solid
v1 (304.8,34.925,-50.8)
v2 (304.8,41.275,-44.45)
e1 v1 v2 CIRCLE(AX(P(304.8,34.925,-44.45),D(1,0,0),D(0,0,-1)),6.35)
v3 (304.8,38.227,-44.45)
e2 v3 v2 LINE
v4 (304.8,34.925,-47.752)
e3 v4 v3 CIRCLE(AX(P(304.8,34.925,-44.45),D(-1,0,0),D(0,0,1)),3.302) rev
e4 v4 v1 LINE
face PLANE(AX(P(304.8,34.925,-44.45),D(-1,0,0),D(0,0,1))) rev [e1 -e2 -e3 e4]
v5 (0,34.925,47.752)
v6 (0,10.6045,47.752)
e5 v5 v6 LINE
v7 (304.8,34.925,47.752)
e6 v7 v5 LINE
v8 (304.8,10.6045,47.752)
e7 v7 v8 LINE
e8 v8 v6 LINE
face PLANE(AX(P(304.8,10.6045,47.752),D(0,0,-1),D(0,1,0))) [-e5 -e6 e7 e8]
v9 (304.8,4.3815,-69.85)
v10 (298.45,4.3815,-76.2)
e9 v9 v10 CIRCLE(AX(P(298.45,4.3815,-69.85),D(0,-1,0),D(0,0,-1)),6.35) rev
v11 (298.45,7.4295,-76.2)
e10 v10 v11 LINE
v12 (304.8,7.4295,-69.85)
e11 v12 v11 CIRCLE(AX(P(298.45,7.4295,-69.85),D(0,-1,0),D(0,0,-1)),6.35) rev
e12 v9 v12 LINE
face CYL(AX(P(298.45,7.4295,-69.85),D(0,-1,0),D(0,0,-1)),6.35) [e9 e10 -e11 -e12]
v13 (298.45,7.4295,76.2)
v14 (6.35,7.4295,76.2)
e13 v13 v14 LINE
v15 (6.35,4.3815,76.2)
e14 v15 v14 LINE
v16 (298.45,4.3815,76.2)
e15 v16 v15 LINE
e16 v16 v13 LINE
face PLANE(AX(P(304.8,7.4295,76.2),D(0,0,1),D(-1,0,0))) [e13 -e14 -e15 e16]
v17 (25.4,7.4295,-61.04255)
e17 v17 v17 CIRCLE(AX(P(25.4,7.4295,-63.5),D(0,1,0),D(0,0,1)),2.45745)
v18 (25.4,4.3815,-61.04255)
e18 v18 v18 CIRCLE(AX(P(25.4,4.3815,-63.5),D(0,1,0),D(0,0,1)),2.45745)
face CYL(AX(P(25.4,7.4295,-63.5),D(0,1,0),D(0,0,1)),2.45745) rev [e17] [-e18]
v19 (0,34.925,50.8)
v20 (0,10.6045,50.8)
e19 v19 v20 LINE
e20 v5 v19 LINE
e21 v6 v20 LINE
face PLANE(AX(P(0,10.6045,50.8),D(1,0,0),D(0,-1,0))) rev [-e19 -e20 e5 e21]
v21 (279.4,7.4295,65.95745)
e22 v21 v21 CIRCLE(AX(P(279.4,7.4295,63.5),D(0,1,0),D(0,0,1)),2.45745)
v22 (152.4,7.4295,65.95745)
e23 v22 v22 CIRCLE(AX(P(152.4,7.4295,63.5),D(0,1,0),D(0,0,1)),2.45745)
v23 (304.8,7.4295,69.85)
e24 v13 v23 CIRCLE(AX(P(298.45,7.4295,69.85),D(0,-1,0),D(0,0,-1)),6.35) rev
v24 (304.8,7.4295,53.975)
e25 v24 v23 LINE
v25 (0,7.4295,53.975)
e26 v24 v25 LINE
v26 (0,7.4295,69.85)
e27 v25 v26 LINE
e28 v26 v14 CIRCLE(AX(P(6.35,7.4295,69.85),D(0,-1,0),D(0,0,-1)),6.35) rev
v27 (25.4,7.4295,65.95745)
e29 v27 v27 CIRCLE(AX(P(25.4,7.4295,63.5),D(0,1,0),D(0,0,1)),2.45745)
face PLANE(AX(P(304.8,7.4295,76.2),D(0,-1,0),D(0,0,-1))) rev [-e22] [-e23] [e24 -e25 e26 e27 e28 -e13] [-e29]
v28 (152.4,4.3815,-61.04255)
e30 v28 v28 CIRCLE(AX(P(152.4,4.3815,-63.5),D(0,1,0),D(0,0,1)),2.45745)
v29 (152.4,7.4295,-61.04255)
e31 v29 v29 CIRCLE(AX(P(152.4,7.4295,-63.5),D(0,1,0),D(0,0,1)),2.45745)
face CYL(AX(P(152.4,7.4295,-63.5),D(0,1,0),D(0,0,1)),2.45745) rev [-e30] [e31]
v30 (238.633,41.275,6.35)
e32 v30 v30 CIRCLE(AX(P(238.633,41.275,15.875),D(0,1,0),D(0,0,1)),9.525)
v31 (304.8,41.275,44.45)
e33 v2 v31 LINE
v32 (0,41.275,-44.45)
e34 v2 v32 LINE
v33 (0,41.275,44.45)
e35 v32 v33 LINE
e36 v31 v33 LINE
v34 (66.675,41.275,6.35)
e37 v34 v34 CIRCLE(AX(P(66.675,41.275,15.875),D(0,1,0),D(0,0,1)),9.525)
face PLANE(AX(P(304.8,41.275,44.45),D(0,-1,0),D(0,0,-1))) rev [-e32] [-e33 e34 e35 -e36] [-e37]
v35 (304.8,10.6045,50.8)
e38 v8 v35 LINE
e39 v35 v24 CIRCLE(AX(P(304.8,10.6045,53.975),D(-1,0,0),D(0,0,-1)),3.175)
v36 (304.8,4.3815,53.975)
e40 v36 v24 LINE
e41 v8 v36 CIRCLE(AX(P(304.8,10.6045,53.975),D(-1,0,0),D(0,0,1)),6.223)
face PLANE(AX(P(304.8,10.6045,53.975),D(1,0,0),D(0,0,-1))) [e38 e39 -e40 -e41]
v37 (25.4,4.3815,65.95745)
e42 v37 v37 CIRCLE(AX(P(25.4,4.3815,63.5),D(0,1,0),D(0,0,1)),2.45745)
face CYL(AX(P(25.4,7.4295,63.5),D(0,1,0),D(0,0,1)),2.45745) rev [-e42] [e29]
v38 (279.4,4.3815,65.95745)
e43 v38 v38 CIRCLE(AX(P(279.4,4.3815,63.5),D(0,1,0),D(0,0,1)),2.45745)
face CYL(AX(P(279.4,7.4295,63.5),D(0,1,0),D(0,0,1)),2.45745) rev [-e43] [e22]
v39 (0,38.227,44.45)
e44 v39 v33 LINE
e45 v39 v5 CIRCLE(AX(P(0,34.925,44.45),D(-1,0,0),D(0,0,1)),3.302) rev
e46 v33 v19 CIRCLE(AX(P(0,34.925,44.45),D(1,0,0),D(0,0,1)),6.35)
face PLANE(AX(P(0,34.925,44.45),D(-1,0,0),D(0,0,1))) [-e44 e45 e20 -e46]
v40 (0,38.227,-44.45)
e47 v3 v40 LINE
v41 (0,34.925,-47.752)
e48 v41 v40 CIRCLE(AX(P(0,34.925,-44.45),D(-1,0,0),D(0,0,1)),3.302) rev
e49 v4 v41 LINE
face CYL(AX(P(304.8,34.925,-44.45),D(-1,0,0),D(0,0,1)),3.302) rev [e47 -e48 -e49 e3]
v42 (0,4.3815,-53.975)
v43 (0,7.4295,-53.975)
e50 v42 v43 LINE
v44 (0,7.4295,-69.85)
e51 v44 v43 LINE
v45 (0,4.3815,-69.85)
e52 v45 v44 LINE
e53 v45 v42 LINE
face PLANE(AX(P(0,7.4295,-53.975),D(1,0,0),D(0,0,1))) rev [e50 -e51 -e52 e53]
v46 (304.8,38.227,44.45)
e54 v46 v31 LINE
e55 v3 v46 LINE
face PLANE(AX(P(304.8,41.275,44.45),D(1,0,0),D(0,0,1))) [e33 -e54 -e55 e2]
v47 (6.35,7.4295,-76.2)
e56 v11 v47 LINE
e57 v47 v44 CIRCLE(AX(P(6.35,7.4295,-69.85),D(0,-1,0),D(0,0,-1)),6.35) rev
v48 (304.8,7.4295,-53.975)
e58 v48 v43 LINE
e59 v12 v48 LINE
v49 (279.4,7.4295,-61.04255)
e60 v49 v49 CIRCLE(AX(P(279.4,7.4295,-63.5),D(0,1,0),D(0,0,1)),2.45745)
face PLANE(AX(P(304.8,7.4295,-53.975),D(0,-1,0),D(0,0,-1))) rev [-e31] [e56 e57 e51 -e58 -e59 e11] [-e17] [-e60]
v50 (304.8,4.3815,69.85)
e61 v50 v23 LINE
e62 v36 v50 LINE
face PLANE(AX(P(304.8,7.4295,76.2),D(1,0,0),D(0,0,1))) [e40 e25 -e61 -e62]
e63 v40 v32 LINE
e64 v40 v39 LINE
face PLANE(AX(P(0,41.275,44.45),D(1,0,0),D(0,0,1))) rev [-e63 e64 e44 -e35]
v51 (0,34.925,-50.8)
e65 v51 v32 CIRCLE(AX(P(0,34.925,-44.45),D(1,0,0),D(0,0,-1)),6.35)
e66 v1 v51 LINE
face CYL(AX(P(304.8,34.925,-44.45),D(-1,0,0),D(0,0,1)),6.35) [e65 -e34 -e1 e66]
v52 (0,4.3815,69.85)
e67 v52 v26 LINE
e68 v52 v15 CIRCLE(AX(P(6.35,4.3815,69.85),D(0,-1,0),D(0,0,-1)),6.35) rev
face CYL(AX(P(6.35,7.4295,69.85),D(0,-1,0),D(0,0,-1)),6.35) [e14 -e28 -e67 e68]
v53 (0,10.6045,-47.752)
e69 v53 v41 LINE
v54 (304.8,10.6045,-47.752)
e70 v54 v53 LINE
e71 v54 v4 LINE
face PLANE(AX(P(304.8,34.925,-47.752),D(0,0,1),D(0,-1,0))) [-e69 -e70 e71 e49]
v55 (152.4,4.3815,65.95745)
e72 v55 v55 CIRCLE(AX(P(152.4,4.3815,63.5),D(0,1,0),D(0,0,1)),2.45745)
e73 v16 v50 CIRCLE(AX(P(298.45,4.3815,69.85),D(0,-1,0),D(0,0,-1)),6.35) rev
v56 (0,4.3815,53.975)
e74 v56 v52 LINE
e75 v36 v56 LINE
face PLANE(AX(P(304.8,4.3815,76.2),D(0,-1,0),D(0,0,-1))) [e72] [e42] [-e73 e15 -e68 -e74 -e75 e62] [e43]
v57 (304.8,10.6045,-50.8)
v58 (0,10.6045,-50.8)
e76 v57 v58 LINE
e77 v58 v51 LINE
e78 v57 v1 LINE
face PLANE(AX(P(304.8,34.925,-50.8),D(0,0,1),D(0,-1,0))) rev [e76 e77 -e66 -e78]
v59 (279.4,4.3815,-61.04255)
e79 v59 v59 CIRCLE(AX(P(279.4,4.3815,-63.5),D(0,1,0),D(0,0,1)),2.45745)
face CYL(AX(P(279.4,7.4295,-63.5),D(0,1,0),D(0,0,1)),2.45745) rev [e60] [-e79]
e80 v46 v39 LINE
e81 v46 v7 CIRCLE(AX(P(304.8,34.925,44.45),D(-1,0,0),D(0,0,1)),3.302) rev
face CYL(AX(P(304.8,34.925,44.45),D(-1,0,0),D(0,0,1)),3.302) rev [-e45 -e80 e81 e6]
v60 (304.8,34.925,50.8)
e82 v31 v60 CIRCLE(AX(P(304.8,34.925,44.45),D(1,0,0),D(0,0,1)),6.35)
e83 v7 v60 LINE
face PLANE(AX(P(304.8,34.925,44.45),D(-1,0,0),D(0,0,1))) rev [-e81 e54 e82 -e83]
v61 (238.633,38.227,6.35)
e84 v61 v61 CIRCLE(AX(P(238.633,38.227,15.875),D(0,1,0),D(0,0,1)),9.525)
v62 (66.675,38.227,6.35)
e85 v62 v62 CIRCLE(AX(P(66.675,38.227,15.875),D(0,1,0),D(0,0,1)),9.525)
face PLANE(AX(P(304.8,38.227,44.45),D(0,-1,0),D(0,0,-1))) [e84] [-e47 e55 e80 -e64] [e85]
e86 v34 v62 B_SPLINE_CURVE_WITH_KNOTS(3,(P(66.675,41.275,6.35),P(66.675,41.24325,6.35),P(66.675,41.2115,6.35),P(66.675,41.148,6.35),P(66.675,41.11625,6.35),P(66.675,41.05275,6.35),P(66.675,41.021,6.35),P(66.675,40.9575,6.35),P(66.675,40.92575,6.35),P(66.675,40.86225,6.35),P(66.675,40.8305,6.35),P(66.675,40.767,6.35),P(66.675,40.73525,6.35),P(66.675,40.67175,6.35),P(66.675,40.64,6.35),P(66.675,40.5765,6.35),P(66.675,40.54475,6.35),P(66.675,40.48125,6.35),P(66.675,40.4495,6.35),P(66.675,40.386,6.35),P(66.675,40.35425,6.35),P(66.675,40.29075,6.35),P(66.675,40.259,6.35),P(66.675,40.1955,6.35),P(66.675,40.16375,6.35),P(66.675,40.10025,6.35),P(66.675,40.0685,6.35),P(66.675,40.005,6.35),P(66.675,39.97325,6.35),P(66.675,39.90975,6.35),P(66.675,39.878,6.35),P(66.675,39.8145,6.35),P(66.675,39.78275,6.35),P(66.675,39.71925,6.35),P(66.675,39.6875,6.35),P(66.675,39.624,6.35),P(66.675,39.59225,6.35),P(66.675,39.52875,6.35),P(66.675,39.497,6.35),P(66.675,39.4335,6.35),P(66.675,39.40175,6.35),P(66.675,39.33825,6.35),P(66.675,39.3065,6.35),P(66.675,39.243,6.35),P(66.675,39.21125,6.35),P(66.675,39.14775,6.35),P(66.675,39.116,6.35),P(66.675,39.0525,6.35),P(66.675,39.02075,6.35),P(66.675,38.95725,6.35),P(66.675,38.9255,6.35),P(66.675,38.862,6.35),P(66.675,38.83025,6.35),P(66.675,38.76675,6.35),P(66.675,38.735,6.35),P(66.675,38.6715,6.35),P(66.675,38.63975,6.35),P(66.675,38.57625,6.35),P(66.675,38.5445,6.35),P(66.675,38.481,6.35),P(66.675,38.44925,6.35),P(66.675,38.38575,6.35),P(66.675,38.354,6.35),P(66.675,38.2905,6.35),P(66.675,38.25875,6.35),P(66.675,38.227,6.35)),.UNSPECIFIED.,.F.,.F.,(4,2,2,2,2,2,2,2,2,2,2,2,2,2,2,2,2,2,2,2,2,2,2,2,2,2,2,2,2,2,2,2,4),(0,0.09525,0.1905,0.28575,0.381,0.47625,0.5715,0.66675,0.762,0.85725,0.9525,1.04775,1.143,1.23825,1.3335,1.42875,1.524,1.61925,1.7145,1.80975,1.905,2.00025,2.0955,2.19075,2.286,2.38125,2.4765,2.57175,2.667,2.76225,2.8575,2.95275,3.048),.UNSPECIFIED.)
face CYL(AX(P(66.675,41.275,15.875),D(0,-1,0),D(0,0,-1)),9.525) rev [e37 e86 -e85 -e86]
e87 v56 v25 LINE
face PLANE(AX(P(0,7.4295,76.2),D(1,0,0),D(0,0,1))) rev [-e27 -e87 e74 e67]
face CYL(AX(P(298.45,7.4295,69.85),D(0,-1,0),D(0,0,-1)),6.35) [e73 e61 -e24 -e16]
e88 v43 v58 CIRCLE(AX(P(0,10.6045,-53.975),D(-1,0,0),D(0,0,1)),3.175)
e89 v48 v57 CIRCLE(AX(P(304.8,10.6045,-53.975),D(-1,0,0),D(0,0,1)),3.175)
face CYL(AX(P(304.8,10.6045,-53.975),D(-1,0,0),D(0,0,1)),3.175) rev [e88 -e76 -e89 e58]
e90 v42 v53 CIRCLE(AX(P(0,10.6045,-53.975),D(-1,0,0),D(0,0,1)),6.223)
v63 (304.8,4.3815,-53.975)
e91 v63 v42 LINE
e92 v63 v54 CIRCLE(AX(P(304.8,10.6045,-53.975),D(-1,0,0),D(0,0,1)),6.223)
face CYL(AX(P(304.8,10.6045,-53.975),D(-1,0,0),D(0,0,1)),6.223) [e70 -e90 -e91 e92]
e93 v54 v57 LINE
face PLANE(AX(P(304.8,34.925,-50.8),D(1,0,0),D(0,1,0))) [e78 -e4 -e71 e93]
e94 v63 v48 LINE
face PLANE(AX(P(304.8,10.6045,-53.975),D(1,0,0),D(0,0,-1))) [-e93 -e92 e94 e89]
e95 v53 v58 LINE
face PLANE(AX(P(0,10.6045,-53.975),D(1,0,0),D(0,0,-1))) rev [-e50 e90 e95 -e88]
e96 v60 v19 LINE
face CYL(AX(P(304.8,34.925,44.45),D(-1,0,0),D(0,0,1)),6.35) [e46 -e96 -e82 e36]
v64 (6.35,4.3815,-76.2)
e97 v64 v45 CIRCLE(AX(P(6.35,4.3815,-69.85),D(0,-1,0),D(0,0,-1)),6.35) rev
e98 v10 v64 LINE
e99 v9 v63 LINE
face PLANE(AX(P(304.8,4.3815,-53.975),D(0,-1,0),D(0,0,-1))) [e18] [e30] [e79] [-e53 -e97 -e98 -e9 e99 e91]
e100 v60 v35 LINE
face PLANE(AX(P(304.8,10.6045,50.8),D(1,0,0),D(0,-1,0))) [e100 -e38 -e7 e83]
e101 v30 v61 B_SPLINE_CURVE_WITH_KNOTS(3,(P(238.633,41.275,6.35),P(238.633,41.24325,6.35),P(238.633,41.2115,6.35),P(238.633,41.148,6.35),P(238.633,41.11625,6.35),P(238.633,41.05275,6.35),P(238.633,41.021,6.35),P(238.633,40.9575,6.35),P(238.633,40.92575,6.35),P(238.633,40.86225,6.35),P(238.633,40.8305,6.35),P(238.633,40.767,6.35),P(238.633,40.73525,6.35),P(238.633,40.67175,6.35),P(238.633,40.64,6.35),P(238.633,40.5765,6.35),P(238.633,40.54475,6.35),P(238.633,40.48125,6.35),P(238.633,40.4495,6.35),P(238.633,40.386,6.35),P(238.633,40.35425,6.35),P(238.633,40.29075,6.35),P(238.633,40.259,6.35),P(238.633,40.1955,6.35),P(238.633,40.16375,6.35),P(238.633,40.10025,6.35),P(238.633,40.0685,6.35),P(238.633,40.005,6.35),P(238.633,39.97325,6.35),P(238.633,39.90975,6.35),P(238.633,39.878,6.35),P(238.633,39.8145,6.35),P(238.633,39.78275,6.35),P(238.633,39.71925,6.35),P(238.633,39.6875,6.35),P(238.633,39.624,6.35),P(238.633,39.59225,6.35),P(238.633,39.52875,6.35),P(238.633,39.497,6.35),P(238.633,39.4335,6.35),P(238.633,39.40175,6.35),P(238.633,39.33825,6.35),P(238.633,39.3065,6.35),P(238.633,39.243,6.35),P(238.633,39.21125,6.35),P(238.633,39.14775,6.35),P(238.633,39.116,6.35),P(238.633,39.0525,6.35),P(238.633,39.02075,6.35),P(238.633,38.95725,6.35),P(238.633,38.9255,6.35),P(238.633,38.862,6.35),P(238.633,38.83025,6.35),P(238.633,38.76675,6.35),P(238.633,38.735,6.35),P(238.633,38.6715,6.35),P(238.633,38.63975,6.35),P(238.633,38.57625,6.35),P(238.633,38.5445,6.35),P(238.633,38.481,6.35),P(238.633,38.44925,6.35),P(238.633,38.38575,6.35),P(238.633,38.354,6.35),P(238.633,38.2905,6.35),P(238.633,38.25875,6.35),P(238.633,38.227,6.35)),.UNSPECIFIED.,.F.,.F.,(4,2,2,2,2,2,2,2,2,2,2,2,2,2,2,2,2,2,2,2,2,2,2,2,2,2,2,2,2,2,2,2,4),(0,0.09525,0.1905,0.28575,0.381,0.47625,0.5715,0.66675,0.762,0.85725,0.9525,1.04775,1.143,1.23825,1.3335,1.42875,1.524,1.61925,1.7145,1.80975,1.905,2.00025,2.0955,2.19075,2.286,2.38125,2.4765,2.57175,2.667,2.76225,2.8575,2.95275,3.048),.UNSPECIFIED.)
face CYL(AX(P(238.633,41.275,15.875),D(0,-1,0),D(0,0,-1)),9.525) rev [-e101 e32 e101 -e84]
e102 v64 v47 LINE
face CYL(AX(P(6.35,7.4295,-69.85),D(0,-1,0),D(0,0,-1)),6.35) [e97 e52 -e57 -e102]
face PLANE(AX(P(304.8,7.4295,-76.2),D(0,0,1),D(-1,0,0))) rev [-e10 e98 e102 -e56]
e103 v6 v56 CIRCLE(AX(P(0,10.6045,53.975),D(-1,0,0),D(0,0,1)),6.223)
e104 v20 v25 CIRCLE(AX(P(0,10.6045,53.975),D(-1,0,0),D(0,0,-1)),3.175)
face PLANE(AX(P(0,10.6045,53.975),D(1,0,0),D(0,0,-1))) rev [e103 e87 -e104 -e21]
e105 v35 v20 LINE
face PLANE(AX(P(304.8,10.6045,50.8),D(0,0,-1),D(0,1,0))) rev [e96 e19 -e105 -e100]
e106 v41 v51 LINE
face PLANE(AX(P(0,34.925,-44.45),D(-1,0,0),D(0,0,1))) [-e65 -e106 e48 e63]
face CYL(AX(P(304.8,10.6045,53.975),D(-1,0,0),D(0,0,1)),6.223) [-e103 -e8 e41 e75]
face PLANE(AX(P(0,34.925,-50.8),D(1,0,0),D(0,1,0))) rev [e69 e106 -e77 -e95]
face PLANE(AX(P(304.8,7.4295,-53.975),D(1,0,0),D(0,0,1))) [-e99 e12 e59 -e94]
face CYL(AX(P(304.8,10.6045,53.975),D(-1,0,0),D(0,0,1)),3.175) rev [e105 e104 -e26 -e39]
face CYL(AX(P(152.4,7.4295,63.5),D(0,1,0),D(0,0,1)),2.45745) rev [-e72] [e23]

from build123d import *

# Parameters (mm, degrees)
BOSS_EXTRUDE1_DEPTH              = 304.8
SKETCH2_R                        = 2.3876
CUT_EXTRUDE1_DEPTH               = 317.354227758
SKETCH3_R                        = 9.525
CUT_EXTRUDE2_DEPTH               = 304.8
LPATTERN1_COUNT                  = 2
LPATTERN1_PITCH                  = 171.958
FILLET1_R                        = 6.35
CONVERT_SOLID1_DEPTH             = 304.8
F_10_0_1935_DIAMETER_HOLE1_D     = 4.9149
F_10_0_1935_DIAMETER_HOLE1_DEPTH = 3.048


# Read off the part's stored shape, not the designer's step: Convert-Solid1
with BuildPart() as part:
    # Sketch1 → Boss-Extrude1 (new body)
    with BuildSketch(Plane(origin=(0, 0, 0), x_dir=(0, 0, -1), z_dir=(1, 0, 0))):
        with BuildLine():
            Line((-76.2, 4.2545), (-53.975, 4.2545))
            ThreePointArc((-53.975, 4.2545), (-49.484871939, 6.114371939), (-47.625, 10.6045))
            Line((-47.625, 10.6045), (-47.625, 34.925))
            ThreePointArc((-47.625, 34.925), (-46.69506403, 37.17006403), (-44.45, 38.1))
            Line((-44.45, 38.1), (44.45, 38.1))
            ThreePointArc((44.45, 38.1), (46.69506403, 37.17006403), (47.625, 34.925))
            Line((47.625, 34.925), (47.625, 10.6045))
            ThreePointArc((47.625, 10.6045), (49.484871939, 6.114371939), (53.975, 4.2545))
            Line((53.975, 4.2545), (76.2, 4.2545))
            Line((76.2, 4.2545), (76.2, 7.4295))
            Line((76.2, 7.4295), (53.975, 7.4295))
            ThreePointArc((53.975, 7.4295), (51.72993597, 8.35943597), (50.8, 10.6045))
            Line((50.8, 10.6045), (50.8, 34.925))
            ThreePointArc((50.8, 34.925), (48.940128061, 39.415128061), (44.45, 41.275))
            Line((44.45, 41.275), (-44.45, 41.275))
            ThreePointArc((-44.45, 41.275), (-48.940128061, 39.415128061), (-50.8, 34.925))
            Line((-50.8, 34.925), (-50.8, 10.6045))
            ThreePointArc((-50.8, 10.6045), (-51.72993597, 8.35943597), (-53.975, 7.4295))
            Line((-53.975, 7.4295), (-76.2, 7.4295))
            Line((-76.2, 7.4295), (-76.2, 4.2545))
        make_face()
    extrude(amount=BOSS_EXTRUDE1_DEPTH)

    # Sketch2 → Cut-Extrude1 (cut, through all)
    with BuildSketch(Plane.XZ.offset(-4.2545)):
        with Locations(Location((25.4, 63.5, 0), (0, 0, 270))):
            Circle(SKETCH2_R)
        with Locations(Location((152.4, 63.5, 0), (0, 0, 270))):
            Circle(SKETCH2_R)
        with Locations(Location((279.4, 63.5, 0), (0, 0, 270))):
            Circle(SKETCH2_R)
    cut_extrude1 = extrude(amount=-CUT_EXTRUDE1_DEPTH, mode=Mode.SUBTRACT)

    # Mirror1: Cut-Extrude1 across plane
    add(cut_extrude1.mirror(Plane.XY), mode=Mode.SUBTRACT)

    # Sketch3 → Cut-Extrude2 (cut)
    with BuildSketch(Plane(origin=(0, 41.275, 0), x_dir=(1, 0, 0), z_dir=(0, 1, 0))):
        with Locations(Location((66.675, -15.875, 0), (0, 0, 270))):
            Circle(SKETCH3_R)
    cut_extrude2 = extrude(amount=-CUT_EXTRUDE2_DEPTH, mode=Mode.SUBTRACT)

    # LPattern1: Cut-Extrude2 ×2
    with Locations(*[(i * LPATTERN1_PITCH, 0, 0) for i in range(1, LPATTERN1_COUNT)]):
        add(cut_extrude2, mode=Mode.SUBTRACT)

    # Fillet1
    fillet1_edges = [part.edges().sort_by_distance(p)[0] for p in [
        (0, 5.842, -76.2),
        (0, 5.842, 76.2),
        (304.8, 5.842, -76.2),
        (304.8, 5.842, 76.2),
    ]]
    fillet(fillet1_edges, radius=FILLET1_R)

    # Convert-Solid1 outline → Convert-Solid1 (cut)
    with BuildSketch(Plane.YZ):
        with BuildLine():
            Line((4.3815, -76.2), (4.3815, -53.975))
            ThreePointArc((4.3815, -53.975), (6.204174501, -49.574674501), (10.6045, -47.752))
            Line((10.6045, -47.752), (34.925, -47.752))
            ThreePointArc((34.925, -47.752), (37.259866591, -46.784866591), (38.227, -44.45))
            Line((38.227, -44.45), (38.227, 44.45))
            ThreePointArc((38.227, 44.45), (37.259866591, 46.784866591), (34.925, 47.752))
            Line((34.925, 47.752), (10.6045, 47.752))
            ThreePointArc((10.6045, 47.752), (6.204174501, 49.574674501), (4.3815, 53.975))
            Line((4.3815, 53.975), (4.3815, 76.2))
            Line((4.3815, 76.2), (4.2545, 76.2))
            Line((4.2545, 76.2), (4.2545, 53.975))
            ThreePointArc((4.2545, 53.975), (6.114371939, 49.484871939), (10.6045, 47.625))
            Line((10.6045, 47.625), (34.925, 47.625))
            ThreePointArc((34.925, 47.625), (37.17006403, 46.69506403), (38.1, 44.45))
            Line((38.1, 44.45), (38.1, -44.45))
            ThreePointArc((38.1, -44.45), (37.17006403, -46.69506403), (34.925, -47.625))
            Line((34.925, -47.625), (10.6045, -47.625))
            ThreePointArc((10.6045, -47.625), (6.114371939, -49.484871939), (4.2545, -53.975))
            Line((4.2545, -53.975), (4.2545, -76.2))
            Line((4.2545, -76.2), (4.3815, -76.2))
        make_face()
    extrude(amount=CONVERT_SOLID1_DEPTH, mode=Mode.SUBTRACT)

    # #10 (0.1935) Diameter Hole1
    with Locations(Plane(origin=(0, 7.4295, 0), x_dir=(1, 0, 0), z_dir=(0, 1, 0))):
        with Locations((25.4, 63.5), (152.4, 63.5), (279.4, 63.5), (279.4, -63.5), (152.4, -63.5), (25.4, -63.5)):
            Hole(F_10_0_1935_DIAMETER_HOLE1_D / 2, depth=F_10_0_1935_DIAMETER_HOLE1_DEPTH)


solid = part.part
